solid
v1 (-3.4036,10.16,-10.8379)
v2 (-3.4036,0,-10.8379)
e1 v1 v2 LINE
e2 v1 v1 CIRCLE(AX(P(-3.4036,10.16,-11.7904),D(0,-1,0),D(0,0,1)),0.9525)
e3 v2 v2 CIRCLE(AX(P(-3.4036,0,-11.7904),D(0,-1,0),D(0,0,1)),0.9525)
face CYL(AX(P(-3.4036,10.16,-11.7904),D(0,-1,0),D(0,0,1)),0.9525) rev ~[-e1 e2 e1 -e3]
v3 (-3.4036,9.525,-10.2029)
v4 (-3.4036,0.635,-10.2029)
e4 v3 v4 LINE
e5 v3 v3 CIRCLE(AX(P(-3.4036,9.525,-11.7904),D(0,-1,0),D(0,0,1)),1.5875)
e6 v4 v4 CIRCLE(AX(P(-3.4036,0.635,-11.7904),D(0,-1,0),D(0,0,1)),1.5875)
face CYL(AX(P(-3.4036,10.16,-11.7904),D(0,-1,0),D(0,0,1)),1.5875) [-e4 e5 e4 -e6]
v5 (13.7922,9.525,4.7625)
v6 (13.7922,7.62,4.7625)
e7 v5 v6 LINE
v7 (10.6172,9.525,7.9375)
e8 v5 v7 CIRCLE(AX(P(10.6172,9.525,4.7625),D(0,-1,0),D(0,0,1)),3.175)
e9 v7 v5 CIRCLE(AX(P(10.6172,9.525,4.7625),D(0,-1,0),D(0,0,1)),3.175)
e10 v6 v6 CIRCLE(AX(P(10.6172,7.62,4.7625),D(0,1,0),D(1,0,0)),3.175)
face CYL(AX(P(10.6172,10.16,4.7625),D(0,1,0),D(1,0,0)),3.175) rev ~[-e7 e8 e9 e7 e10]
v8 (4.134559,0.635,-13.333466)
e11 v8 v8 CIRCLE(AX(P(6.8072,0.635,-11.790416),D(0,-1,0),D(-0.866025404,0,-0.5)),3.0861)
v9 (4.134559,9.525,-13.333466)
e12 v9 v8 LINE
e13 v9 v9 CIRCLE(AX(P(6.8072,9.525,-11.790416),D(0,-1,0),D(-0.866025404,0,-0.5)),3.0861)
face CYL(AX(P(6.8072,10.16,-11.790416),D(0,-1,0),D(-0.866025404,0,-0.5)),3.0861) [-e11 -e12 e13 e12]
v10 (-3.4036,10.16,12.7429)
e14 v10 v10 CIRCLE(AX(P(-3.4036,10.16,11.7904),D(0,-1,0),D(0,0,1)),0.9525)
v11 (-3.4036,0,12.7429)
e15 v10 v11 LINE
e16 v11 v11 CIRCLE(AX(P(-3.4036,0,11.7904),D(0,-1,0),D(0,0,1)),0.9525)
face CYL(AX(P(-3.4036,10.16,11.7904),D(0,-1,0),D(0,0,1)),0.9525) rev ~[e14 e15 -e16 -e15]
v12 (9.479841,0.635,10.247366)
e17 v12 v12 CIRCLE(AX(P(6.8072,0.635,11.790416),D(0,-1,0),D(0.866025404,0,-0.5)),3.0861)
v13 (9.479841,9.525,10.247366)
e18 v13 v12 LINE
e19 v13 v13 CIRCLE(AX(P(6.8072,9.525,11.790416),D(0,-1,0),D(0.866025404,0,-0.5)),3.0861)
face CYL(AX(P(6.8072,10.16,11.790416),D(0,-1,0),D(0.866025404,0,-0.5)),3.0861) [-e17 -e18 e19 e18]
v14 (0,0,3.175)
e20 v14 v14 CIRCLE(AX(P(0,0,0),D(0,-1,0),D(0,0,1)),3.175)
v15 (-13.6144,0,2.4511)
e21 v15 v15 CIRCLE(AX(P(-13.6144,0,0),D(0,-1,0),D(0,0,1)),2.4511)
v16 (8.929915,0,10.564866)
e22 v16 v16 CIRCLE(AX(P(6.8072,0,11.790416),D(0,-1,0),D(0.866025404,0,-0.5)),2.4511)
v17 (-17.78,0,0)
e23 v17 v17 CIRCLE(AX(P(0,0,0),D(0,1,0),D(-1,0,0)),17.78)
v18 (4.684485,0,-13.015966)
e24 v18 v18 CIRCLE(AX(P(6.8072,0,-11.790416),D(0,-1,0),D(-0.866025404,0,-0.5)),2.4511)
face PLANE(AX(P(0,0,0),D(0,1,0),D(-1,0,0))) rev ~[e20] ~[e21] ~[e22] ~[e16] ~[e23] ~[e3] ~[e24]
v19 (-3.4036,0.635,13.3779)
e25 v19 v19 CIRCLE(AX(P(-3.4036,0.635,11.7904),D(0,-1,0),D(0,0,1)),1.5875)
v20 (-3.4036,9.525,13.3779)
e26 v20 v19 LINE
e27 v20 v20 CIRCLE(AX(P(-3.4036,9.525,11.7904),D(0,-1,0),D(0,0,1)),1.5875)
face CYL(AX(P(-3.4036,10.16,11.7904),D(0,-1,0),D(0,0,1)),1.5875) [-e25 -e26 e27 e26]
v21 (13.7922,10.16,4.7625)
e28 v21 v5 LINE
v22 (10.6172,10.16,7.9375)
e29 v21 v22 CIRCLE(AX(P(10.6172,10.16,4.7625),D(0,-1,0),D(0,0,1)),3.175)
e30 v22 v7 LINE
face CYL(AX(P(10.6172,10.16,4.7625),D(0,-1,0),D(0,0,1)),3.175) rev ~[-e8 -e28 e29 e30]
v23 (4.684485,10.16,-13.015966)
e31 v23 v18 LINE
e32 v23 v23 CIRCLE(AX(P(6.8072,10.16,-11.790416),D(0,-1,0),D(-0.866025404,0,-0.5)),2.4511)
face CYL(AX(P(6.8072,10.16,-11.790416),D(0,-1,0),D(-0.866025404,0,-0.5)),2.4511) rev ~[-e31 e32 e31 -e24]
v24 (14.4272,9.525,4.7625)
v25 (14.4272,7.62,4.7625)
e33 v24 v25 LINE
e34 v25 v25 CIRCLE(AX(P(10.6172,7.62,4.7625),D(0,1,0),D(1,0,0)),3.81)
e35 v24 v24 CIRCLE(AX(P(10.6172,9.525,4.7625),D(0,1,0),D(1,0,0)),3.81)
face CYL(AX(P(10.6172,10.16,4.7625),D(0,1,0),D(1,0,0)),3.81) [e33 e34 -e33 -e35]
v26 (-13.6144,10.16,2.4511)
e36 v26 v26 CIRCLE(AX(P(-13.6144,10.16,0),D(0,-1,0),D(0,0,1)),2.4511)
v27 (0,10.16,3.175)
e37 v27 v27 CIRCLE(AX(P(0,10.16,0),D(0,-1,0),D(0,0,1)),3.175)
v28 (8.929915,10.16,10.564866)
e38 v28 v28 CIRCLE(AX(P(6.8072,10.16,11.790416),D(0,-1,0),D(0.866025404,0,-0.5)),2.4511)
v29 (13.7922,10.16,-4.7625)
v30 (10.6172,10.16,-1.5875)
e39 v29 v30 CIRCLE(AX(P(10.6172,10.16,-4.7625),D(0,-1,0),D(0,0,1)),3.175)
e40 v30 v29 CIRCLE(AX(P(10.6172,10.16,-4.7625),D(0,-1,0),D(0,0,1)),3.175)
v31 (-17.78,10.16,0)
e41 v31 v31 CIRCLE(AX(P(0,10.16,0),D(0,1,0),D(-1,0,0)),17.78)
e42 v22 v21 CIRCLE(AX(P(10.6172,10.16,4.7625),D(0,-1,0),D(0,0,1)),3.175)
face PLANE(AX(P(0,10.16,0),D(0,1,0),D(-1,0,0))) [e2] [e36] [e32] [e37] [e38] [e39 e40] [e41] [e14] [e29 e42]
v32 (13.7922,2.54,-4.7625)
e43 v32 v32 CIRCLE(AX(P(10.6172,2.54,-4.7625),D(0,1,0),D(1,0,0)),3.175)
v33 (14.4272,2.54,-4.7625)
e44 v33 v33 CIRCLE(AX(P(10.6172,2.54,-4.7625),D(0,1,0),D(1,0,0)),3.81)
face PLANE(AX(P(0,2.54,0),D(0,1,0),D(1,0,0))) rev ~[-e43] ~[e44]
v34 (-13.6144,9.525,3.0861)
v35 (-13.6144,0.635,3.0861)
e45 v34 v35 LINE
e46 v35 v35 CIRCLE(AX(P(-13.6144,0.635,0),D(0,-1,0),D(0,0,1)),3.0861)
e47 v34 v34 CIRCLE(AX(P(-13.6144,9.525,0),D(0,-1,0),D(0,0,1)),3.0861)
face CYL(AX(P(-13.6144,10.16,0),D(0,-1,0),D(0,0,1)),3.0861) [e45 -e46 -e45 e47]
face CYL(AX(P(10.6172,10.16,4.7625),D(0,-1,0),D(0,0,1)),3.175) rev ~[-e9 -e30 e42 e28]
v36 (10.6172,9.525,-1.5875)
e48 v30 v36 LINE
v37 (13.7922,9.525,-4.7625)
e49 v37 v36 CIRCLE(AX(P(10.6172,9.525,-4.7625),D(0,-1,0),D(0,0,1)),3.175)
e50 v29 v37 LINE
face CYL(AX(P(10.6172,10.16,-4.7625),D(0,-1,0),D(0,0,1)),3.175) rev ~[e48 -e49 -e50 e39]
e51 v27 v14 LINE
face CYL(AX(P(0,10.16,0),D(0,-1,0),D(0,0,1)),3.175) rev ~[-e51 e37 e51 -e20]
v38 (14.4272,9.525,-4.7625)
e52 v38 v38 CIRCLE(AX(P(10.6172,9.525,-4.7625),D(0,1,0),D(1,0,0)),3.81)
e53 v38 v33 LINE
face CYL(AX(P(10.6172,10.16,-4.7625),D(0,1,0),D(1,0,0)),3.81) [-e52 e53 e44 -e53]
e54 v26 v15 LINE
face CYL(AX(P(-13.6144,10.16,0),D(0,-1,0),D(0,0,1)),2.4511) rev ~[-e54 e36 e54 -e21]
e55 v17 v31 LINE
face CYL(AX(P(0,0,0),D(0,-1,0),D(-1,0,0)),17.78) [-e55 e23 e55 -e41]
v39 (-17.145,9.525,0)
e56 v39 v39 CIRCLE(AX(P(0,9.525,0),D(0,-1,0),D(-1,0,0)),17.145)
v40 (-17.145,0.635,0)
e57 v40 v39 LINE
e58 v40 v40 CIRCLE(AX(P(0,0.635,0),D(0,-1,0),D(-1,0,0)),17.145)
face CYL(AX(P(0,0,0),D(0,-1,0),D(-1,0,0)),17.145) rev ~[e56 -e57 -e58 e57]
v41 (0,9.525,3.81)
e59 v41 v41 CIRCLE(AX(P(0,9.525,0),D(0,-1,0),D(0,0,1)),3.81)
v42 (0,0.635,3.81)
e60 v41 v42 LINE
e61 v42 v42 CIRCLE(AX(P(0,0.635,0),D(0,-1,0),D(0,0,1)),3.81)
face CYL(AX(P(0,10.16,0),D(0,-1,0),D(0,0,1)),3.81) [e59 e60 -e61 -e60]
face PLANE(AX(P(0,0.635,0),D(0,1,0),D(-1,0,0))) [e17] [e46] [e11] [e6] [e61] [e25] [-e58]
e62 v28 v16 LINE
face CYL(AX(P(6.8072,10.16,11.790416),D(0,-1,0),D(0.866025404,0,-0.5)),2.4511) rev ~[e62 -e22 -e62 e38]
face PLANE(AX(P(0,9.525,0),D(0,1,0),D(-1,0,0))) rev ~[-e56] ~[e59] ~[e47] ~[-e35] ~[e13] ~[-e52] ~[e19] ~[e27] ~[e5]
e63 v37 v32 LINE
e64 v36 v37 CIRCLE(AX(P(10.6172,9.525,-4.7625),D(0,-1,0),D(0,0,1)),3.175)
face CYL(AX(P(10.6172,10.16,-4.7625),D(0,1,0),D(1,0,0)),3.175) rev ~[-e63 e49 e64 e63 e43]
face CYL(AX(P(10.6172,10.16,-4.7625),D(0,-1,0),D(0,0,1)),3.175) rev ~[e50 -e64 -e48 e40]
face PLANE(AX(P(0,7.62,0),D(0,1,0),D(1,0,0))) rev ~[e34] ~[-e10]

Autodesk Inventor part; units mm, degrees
ref_plane "YZ Plane" through (0, 0, 0) normal (1, 0, 0) x (0, 1, 0)
ref_plane "XZ Plane" through (0, 0, 0) normal (0, 1, 0) x (-1, 0, 0)
ref_plane "XY Plane" through (0, 0, 0) normal (0, 0, 1) x (1, 0, 0)
sketch "Sketch1" plane through (0, 0, 0) normal (0, 1, 0) x (-1, 0, 0)
  circle A0 centre (0, 0) radius 17.78
  dimension "d0" = 35.56
extrude "Extrusion1" add sketch "Sketch1" along normal blind 10.16
sketch "Sketch2" plane through (0, 10.16, 0) normal (0, 1, 0) x (1, 0, 0)
  circle A0 centre (0, 0) radius 17.78 projected
hole "Hole1" at (0, 10.16, 0) direction (0, -1, 0) diameter 6.35 end through all
sketch "Sketch3" plane through (0, 10.16, 0) normal (0, 1, 0) x (1, 0, 0)
  line L0 (0, 0) -> (-13.6144, 0)
  dimension "d10" = 13.6144
hole "Hole2" at (-13.6144, 10.16, 0) direction (0, -1, 0) diameter 4.9022 end through all
pattern_circular "Circular Pattern1" count 3 over 360 about axis through (0, -41.1455, 0) along (0, 1, 0) of "Hole2"
sketch "Sketch5" plane through (0, 10.16, 0) normal (0, 1, 0) x (1, 0, 0)
  circle A0 centre (-13.6144, 0) radius 2.4511 projected
  circle A1 centre (6.8072, 11.7904) radius 2.4511 projected
  line L0 (-13.6144, 0) -> (6.8072, 11.7904)
  circle A2 centre (6.8072, -11.7904) radius 2.4511 projected
  line L1 (6.8072, 11.7904) -> (6.8072, -11.7904)
  line L2 (6.8072, -11.7904) -> (-13.6144, 0)
  line L3 (-13.6144, 0) -> (-13.6144, -11.7904)
  line L4 (-13.6144, -11.7904) -> (6.8072, -11.7904)
  line L5 (-13.6144, 0) -> (-13.6144, 11.7904)
  line L6 (-13.6144, 11.7904) -> (6.8072, 11.7904)
  circle A3 centre (-3.4036, 11.7904) radius 0.635
  circle A4 centre (-3.4036, -11.7904) radius 0.635
  point P0 (0, 0)
  dimension "d28" = 1.27
hole "Hole4" at (-3.4036, 10.16, 11.7904) at (-3.4036, 10.16, -11.7904) direction (0, -1, 0) diameter 1.905 end through all
sketch "Sketch15" plane through (0, 10.16, 0) normal (0, 1, 0) x (1, 0, 0)
  circle A0 centre (10.6172, -4.7625) radius 3.175 projected
  circle A1 centre (10.6172, 4.7625) radius 3.175 projected
  point P0 (0, 0)
shell "Shell3" thickness 0.635 removed faces 0
hole "Hole7" at (10.6172, 10.16, 4.7625) at (10.6172, 10.16, -4.7625) direction (0, -1, 0) diameter 6.35 depth 5.08
sketch "Sketch16" plane through (0, 10.16, 0) normal (0, 1, 0) x (1, 0, 0)
  circle A0 centre (10.6172, 4.7625) radius 3.175 projected
  circle A1 centre (10.6172, 4.7625) radius 3.81
  circle A2 centre (10.6172, -4.7625) radius 3.175 projected
  circle A3 centre (10.6172, -4.7625) radius 3.81
  circle A4 centre (10.6172, 4.7625) radius 3.175
  circle A5 centre (10.6172, -4.7625) radius 3.175
  point P0 (0, 0)
  dimension "d85" = 7.62
  dimension "d86" = 7.62
extrude "Extrusion7" add sketch "Sketch16" against normal blind 2.54 contours A3
extrude "Extrusion8" add sketch "Sketch16" against normal blind 7.62 contours A1
properties part number "water"
